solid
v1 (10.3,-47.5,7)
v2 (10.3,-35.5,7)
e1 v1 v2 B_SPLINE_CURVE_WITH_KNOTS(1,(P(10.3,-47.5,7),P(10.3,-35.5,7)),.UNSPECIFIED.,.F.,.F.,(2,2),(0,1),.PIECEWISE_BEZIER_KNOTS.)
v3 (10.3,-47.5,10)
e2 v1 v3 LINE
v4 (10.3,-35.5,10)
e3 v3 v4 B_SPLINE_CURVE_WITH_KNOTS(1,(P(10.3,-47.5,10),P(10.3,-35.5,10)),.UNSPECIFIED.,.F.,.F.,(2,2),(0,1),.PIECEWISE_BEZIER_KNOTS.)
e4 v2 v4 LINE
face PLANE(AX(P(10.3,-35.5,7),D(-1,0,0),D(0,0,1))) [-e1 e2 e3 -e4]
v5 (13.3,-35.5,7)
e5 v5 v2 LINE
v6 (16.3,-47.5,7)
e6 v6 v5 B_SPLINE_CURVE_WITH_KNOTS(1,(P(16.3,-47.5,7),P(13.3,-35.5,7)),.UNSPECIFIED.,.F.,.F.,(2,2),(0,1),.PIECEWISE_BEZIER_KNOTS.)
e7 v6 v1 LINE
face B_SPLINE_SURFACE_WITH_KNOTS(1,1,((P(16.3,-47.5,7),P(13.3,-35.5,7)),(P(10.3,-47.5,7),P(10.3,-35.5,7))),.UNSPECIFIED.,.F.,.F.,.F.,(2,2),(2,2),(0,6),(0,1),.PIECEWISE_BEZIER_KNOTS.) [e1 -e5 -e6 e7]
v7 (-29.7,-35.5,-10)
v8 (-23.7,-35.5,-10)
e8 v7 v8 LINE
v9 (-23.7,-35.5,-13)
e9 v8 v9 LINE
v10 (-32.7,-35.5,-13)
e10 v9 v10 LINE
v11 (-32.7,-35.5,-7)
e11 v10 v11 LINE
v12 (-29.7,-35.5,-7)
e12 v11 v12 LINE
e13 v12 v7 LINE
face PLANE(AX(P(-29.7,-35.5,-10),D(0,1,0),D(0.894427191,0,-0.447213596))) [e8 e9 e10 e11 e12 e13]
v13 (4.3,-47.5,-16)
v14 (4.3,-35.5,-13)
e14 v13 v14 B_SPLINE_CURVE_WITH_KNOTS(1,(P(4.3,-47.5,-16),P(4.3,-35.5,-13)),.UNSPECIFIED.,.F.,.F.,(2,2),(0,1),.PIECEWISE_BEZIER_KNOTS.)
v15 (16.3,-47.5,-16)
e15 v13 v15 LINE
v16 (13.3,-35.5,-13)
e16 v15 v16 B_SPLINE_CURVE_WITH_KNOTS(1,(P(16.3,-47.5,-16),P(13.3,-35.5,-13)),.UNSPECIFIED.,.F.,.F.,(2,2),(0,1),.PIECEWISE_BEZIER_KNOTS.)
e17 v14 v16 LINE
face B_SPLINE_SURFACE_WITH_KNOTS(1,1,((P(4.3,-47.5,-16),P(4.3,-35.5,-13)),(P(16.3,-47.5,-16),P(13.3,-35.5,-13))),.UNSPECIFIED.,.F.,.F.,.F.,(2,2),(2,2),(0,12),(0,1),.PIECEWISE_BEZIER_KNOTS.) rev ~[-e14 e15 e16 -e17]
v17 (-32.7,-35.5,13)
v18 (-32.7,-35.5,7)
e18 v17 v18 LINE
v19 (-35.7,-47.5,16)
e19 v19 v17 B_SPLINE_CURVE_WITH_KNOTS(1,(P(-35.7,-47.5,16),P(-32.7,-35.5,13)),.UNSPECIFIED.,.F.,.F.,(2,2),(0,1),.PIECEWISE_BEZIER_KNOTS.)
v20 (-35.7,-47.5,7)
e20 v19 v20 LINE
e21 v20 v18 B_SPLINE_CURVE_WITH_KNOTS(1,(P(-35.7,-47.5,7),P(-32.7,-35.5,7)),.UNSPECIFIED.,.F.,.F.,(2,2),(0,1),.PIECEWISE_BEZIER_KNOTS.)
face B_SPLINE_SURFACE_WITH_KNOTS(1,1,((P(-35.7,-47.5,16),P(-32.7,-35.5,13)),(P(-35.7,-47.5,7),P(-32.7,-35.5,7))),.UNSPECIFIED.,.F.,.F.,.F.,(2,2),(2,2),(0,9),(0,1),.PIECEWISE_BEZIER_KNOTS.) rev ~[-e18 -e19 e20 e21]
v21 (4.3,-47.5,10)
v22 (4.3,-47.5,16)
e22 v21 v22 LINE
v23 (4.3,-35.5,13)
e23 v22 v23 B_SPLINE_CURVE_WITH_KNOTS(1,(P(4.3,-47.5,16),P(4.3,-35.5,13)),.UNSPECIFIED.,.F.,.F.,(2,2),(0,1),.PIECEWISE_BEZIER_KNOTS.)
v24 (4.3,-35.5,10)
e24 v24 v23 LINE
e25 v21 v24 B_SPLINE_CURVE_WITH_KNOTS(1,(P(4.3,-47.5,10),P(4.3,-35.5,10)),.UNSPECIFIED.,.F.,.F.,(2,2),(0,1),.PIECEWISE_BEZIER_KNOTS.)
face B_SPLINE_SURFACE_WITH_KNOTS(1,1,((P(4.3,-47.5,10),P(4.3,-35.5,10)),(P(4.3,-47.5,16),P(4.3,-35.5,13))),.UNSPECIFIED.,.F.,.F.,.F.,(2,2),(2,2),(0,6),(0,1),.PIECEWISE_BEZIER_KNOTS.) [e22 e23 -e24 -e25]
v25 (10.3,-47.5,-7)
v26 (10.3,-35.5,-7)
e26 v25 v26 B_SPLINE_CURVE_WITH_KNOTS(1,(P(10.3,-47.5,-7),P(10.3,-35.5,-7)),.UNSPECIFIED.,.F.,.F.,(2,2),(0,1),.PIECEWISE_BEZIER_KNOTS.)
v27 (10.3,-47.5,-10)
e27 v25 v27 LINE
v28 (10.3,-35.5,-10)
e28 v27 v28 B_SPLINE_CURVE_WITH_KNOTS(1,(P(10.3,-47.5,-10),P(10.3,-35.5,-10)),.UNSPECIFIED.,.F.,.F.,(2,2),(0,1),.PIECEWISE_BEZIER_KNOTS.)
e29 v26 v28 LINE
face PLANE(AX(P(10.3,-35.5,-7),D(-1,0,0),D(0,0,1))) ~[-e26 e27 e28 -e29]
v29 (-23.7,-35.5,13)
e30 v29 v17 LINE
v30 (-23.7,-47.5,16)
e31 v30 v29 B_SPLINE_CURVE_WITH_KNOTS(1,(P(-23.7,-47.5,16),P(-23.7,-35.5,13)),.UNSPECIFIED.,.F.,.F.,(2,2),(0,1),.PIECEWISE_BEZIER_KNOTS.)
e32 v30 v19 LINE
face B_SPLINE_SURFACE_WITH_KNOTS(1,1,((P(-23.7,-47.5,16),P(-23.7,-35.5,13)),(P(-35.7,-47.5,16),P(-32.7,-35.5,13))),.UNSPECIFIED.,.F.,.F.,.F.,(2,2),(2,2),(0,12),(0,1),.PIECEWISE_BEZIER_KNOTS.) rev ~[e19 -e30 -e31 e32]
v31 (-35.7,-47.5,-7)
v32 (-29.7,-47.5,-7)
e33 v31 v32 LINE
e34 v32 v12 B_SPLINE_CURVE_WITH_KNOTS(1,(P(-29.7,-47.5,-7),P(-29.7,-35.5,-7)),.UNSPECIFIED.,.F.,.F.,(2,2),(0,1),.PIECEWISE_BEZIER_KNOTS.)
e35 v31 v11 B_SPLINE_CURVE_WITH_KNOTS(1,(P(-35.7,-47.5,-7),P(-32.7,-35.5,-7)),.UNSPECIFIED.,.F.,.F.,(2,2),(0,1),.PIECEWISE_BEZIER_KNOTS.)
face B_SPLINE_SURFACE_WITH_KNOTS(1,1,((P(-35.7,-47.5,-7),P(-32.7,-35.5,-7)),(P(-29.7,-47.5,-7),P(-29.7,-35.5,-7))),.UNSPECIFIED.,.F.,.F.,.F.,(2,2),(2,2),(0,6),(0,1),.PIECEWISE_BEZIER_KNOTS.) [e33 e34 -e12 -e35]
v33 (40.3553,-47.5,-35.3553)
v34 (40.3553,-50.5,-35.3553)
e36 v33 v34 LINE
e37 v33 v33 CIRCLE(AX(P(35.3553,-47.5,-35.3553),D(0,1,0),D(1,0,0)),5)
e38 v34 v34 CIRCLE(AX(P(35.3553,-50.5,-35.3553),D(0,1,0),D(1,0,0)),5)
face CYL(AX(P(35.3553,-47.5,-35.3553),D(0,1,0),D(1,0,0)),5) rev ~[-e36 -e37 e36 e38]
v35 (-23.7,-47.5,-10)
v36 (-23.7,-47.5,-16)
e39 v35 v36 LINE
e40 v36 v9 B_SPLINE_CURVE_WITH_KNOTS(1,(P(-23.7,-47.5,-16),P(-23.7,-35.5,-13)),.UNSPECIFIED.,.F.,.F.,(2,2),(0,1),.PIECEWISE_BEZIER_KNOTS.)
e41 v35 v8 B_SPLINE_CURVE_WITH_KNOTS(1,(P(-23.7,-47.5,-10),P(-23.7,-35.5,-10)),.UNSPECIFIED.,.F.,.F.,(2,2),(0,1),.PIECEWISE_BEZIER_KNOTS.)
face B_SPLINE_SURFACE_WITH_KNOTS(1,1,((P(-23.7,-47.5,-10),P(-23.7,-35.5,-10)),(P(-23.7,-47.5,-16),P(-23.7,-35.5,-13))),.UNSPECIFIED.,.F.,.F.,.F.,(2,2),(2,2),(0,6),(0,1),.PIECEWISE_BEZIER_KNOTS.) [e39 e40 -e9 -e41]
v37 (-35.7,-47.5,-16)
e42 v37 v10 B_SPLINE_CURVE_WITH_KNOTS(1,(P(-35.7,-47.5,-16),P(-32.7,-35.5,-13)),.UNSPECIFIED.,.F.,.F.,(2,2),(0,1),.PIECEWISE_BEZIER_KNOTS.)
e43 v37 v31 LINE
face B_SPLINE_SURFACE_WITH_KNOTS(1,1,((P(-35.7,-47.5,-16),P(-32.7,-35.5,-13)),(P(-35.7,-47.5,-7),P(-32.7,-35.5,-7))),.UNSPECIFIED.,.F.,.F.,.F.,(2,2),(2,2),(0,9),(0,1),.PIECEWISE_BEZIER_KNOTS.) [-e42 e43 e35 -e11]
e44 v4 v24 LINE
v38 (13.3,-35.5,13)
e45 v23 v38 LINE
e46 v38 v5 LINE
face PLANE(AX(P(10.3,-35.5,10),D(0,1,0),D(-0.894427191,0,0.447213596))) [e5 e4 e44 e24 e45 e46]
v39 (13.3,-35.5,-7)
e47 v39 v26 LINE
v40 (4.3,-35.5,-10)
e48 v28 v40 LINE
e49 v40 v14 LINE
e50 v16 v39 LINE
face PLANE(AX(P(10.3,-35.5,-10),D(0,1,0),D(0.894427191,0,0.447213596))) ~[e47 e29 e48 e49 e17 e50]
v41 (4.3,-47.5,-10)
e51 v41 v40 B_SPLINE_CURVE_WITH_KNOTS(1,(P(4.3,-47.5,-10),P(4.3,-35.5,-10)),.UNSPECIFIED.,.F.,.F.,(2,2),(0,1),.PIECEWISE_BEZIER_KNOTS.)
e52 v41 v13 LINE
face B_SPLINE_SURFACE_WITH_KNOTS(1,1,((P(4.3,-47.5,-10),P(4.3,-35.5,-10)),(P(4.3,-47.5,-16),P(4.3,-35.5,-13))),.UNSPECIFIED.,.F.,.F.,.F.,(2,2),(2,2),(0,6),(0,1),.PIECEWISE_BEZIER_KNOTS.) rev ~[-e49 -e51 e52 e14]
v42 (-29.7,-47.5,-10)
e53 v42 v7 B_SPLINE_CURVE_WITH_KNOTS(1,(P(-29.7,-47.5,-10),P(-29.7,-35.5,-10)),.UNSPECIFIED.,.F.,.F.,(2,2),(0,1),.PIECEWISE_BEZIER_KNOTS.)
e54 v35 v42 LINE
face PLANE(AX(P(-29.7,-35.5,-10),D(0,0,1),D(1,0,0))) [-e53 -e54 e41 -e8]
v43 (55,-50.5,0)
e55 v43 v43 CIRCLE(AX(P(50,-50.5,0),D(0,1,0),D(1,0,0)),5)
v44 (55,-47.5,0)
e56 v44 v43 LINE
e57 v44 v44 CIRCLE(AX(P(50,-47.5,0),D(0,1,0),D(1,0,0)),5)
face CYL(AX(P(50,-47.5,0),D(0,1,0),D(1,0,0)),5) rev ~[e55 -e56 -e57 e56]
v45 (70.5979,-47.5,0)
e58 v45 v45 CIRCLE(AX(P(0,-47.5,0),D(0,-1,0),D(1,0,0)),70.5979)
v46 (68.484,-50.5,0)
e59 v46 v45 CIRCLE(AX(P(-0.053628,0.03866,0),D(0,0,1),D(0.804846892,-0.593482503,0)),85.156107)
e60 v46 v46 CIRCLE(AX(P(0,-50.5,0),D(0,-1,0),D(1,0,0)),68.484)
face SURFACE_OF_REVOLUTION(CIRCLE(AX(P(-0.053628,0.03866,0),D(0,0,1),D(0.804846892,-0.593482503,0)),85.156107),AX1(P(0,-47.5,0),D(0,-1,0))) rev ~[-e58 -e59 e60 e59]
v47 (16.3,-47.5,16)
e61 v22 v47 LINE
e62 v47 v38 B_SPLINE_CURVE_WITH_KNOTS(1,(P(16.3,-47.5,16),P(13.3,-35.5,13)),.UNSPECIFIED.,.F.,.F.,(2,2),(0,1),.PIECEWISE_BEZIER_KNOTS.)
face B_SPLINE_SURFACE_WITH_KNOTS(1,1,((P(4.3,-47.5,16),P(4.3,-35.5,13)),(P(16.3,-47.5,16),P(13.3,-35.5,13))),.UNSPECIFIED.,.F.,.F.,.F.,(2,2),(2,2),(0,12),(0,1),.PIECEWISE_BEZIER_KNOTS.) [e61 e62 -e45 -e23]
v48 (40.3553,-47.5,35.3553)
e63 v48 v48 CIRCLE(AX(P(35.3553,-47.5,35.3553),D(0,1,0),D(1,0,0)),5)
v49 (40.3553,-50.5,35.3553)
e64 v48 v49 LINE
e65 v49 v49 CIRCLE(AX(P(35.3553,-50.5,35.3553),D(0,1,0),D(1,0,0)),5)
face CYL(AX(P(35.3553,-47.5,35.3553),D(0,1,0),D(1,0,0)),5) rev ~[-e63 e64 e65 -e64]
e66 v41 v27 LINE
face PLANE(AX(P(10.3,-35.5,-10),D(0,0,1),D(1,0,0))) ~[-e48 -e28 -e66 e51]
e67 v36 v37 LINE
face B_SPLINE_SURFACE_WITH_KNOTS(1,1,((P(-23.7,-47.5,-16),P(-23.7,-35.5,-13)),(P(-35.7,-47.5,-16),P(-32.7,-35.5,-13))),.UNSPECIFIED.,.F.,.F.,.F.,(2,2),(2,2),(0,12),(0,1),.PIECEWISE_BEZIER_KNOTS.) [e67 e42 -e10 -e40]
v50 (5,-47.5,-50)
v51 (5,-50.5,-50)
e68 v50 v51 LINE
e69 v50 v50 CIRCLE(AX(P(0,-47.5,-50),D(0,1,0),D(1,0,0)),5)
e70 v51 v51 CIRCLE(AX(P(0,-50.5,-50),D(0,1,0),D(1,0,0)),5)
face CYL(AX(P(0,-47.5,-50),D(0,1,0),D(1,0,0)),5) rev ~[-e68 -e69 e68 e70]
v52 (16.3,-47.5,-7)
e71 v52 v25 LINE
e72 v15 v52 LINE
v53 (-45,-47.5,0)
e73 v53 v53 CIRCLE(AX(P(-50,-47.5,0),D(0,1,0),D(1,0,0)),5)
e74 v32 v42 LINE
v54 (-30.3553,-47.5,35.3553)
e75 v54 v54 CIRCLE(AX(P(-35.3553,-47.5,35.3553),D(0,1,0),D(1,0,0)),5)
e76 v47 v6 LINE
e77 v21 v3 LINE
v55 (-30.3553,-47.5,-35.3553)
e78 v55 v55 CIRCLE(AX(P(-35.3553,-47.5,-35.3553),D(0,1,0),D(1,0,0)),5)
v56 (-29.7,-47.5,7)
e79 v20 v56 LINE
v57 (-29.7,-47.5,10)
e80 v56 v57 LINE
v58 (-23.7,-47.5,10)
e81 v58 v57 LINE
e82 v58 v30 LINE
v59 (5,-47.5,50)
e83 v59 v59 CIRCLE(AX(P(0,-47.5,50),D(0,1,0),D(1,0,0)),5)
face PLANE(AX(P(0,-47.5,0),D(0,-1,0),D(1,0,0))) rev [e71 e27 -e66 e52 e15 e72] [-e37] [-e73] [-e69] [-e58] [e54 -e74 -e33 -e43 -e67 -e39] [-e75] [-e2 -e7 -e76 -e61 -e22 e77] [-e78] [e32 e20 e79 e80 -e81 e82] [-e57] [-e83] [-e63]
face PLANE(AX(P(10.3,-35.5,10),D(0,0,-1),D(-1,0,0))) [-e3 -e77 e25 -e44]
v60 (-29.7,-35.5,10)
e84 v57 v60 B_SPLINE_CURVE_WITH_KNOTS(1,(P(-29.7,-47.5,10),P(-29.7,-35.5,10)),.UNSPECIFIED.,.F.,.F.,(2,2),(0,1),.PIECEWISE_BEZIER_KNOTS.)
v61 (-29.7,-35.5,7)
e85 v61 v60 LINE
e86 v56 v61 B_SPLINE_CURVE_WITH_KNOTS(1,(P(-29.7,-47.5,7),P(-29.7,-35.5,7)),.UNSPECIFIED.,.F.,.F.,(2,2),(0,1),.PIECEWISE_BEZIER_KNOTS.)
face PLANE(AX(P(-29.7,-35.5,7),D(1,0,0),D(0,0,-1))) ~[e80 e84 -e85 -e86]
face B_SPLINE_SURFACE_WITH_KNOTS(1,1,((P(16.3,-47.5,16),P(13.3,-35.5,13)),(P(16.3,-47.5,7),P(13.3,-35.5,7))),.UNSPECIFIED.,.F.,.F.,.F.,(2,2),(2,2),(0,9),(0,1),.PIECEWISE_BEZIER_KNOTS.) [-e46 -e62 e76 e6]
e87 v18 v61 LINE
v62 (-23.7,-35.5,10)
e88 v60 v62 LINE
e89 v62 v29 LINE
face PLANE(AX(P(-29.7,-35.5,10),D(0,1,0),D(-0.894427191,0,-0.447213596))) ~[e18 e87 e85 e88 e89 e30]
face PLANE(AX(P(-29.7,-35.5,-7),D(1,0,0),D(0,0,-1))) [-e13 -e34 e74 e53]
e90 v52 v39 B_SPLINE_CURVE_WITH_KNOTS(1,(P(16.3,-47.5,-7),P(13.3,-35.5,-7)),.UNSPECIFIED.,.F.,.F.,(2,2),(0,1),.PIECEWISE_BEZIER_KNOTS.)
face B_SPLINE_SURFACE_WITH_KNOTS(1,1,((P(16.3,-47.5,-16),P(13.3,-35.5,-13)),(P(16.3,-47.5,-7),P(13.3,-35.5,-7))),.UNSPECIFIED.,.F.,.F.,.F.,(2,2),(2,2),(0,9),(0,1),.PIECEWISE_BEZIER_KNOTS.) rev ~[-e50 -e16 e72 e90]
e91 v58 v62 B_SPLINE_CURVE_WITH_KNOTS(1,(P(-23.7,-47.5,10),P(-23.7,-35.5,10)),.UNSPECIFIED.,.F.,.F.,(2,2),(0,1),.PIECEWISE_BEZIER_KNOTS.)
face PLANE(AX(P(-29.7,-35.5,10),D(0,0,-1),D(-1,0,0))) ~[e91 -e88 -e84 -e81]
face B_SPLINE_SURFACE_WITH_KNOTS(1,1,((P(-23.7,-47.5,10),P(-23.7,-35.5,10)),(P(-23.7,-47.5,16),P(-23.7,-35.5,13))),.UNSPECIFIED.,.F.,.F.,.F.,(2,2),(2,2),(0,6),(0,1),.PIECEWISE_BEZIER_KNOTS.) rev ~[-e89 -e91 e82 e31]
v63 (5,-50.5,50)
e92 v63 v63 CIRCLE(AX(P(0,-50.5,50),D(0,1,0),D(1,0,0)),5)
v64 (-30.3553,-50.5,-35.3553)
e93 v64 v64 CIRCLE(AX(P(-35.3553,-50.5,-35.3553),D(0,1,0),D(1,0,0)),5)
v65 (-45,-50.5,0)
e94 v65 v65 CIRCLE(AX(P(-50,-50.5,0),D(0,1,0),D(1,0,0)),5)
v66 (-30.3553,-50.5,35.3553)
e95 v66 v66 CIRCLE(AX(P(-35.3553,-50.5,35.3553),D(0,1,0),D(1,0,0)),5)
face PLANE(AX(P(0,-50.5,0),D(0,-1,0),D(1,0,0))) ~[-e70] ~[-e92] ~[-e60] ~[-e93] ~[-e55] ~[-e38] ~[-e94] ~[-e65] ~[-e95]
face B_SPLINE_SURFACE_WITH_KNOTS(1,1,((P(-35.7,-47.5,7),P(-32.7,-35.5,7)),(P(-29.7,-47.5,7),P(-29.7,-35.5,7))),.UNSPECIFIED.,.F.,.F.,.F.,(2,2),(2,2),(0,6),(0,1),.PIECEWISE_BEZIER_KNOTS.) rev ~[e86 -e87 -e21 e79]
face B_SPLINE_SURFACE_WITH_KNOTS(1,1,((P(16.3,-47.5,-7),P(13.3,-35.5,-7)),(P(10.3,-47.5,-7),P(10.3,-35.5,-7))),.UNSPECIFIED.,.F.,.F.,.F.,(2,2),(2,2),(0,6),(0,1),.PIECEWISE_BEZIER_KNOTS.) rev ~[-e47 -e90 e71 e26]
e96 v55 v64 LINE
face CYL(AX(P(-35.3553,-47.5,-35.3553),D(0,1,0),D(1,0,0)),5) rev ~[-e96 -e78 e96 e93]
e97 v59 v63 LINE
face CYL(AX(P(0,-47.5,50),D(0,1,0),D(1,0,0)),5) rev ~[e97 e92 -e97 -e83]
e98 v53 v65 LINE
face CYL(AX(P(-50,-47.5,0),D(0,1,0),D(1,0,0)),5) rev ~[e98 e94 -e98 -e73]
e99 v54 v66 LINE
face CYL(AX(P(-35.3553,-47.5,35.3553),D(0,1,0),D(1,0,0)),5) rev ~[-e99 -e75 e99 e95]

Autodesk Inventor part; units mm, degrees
sketch "Sketch1" plane through (0, 0, 0) normal (0, 0, 1) x (1, 0, 0)
  arc A0 (68.484, -50.5) -> (70.5979, -47.5) centre (0, 0) ccw
  line L0 (0, -47.5) -> (70.5979, -47.5)
  line L1 (0, -47.5) -> (0, -50.5)
  line L2 (0, -50.5) -> (68.484, -50.5)
  dimension "d0" = 170.18
  dimension "d1" = 37.59
  dimension "d13" = 3
revolve "Revolution1" add sketch "Sketch1" angle 360 about axis through (0, -47.5, 0) along (0, -1, 0)
ref_plane "Work Plane1" through (0, -35.5, 0) normal (0, 1, 0) x (1, 0, 0)
sketch "Sketch2" plane through (0, -35.5, 0) normal (0, 1, 0) x (1, 0, 0)
  line L0 (10.3, -10) -> (-29.7, -10) construction
  line L1 (-29.7, -10) -> (-29.7, 10) construction
  line L2 (-29.7, 10) -> (10.3, 10) construction
  line L3 (10.3, 10) -> (10.3, -10) construction
  line L4 (0, 0) -> (-20, 0) construction
  line L5 (10.3, 10) -> (10.3, 7)
  line L6 (10.3, 7) -> (13.3, 7)
  line L7 (13.3, 7) -> (13.3, 13)
  line L8 (13.3, 13) -> (4.3, 13)
  line L9 (4.3, 13) -> (4.3, 10)
  line L10 (10.3, 10) -> (4.3, 10)
  line L11 (-9.7, 10) -> (-9.7, -10) construction
  line L12 (-19.4, 0) -> (0.6, 0) construction
  line L13 (-29.7, 10) -> (-29.7, 7)
  line L14 (-29.7, 7) -> (-32.7, 7)
  line L15 (-32.7, 7) -> (-32.7, 13)
  line L16 (-32.7, 13) -> (-23.7, 13)
  line L17 (-23.7, 13) -> (-23.7, 10)
  line L18 (-29.7, 10) -> (-23.7, 10)
  line L19 (10.3, -10) -> (10.3, -7)
  line L20 (10.3, -7) -> (13.3, -7)
  line L21 (13.3, -7) -> (13.3, -13)
  line L22 (13.3, -13) -> (4.3, -13)
  line L23 (4.3, -13) -> (4.3, -10)
  line L24 (10.3, -10) -> (4.3, -10)
  line L25 (-29.7, -10) -> (-29.7, -7)
  line L26 (-23.7, -13) -> (-23.7, -10)
  line L27 (-32.7, -13) -> (-23.7, -13)
  line L28 (-29.7, -7) -> (-32.7, -7)
  line L29 (-32.7, -7) -> (-32.7, -13)
  line L30 (-29.7, -10) -> (-23.7, -10)
  dimension "d3" = 40
  dimension "d4" = 20
  dimension "d5" = 20
  dimension "d6" = 29.7
  dimension "d7" = 3
  dimension "d8" = 3
  dimension "d9" = 6
  dimension "d10" = 9
sketch "Sketch4" plane through (0, 0, 0) normal (0, 0, 1) x (1, 0, 0)
  arc A0 (0, -85.09) -> (85.09, 0) centre (0, 0) ccw
  line L0 (0, -85.09) -> (0, 0) construction
  line L1 (0, 0) -> (85.09, 0) construction
  dimension "d28" = 170.18
surface revolve "RevolutionSrf1" sketch "Sketch4" angle 360 about axis through (0, -85.09, 0) along (0, 1, 0) shown yes curves A0
sketch "Sketch5" plane through (0, -47.5, 0) normal (0, 1, 0) x (1, 0, 0)
  circle A0 centre (-50, 0) radius 5
  circle A1 centre (-35.3553, -35.3553) radius 5
  circle A2 centre (0, -50) radius 5
  circle A3 centre (35.3553, -35.3553) radius 5
  circle A4 centre (50, 0) radius 5
  circle A5 centre (35.3553, 35.3553) radius 5
  circle A6 centre (0, 50) radius 5
  circle A7 centre (-35.3553, 35.3553) radius 5
  point P0 (0, 0)
  dimension "d38" = 10
  dimension "d39" = 50
  dimension "d42" = 360
extrude "Extrusion3" cut sketch "Sketch5" against normal through all
sketch "Sketch6" plane through (0, -47.5, 0) normal (0, 1, 0) x (1, 0, 0)
  line L0 (-23.7, 10) -> (-29.7, 10)
  line L1 (-23.7, 10) -> (-23.7, 16)
  line L2 (-23.7, 16) -> (-35.7, 16)
  line L3 (-35.7, 16) -> (-35.7, 7)
  line L4 (-29.7, 7) -> (-29.7, 10)
  line L5 (-35.7, 7) -> (-29.7, 7)
  line L6 (-29.7, 7) -> (-29.7, 10)
  line L7 (-9.7, 10) -> (-9.7, -10) construction
  line L8 (-19.4, 0) -> (0.6, 0) construction
  point P0 (0, 0)
  dimension "d46" = 6
  dimension "d47" = 12
  dimension "d48" = 9
  dimension "d49" = 90
sketch "Sketch7" plane through (0, -35.5, 0) normal (0, 1, 0) x (1, 0, 0)
  line L0 (-29.7, 10) -> (-23.7, 10)
  line L1 (-23.7, 10) -> (-23.7, 13)
  line L2 (-23.7, 13) -> (-32.7, 13)
  line L3 (-32.7, 13) -> (-32.7, 7)
  line L4 (-32.7, 7) -> (-29.7, 7)
  line L5 (-29.7, 7) -> (-29.7, 10)
  point P0 (0, 0)
  dimension "d51" = 6
  dimension "d52" = 3
  dimension "d53" = 90
  dimension "d54" = 9
  dimension "d55" = 90
  dimension "d56" = 6
  dimension "d57" = 3
sketch "Sketch8" plane through (0, -35.5, 0) normal (0, 1, 0) x (1, 0, 0)
  point P0 (0, 0)
loft "Loft1" add profiles "Sketch6", "Sketch7"
ref_plane "Work Plane2" through (-9.7, -35.5, -10) normal (-1, 0, 0) x (0, 0, 1)
ref_plane "Work Plane3" through (-19.4, -35.5, 0) normal (0, 0, 1) x (1, 0, 0)
mirror "Mirror1" about plane through (-9.7, -35.5, -10) normal (-1, 0, 0) of "Loft1"
mirror "Mirror2" about plane through (-19.4, -35.5, 0) normal (0, 0, 1) of "Loft1", "Mirror1"
properties part number "bottom_platform"
